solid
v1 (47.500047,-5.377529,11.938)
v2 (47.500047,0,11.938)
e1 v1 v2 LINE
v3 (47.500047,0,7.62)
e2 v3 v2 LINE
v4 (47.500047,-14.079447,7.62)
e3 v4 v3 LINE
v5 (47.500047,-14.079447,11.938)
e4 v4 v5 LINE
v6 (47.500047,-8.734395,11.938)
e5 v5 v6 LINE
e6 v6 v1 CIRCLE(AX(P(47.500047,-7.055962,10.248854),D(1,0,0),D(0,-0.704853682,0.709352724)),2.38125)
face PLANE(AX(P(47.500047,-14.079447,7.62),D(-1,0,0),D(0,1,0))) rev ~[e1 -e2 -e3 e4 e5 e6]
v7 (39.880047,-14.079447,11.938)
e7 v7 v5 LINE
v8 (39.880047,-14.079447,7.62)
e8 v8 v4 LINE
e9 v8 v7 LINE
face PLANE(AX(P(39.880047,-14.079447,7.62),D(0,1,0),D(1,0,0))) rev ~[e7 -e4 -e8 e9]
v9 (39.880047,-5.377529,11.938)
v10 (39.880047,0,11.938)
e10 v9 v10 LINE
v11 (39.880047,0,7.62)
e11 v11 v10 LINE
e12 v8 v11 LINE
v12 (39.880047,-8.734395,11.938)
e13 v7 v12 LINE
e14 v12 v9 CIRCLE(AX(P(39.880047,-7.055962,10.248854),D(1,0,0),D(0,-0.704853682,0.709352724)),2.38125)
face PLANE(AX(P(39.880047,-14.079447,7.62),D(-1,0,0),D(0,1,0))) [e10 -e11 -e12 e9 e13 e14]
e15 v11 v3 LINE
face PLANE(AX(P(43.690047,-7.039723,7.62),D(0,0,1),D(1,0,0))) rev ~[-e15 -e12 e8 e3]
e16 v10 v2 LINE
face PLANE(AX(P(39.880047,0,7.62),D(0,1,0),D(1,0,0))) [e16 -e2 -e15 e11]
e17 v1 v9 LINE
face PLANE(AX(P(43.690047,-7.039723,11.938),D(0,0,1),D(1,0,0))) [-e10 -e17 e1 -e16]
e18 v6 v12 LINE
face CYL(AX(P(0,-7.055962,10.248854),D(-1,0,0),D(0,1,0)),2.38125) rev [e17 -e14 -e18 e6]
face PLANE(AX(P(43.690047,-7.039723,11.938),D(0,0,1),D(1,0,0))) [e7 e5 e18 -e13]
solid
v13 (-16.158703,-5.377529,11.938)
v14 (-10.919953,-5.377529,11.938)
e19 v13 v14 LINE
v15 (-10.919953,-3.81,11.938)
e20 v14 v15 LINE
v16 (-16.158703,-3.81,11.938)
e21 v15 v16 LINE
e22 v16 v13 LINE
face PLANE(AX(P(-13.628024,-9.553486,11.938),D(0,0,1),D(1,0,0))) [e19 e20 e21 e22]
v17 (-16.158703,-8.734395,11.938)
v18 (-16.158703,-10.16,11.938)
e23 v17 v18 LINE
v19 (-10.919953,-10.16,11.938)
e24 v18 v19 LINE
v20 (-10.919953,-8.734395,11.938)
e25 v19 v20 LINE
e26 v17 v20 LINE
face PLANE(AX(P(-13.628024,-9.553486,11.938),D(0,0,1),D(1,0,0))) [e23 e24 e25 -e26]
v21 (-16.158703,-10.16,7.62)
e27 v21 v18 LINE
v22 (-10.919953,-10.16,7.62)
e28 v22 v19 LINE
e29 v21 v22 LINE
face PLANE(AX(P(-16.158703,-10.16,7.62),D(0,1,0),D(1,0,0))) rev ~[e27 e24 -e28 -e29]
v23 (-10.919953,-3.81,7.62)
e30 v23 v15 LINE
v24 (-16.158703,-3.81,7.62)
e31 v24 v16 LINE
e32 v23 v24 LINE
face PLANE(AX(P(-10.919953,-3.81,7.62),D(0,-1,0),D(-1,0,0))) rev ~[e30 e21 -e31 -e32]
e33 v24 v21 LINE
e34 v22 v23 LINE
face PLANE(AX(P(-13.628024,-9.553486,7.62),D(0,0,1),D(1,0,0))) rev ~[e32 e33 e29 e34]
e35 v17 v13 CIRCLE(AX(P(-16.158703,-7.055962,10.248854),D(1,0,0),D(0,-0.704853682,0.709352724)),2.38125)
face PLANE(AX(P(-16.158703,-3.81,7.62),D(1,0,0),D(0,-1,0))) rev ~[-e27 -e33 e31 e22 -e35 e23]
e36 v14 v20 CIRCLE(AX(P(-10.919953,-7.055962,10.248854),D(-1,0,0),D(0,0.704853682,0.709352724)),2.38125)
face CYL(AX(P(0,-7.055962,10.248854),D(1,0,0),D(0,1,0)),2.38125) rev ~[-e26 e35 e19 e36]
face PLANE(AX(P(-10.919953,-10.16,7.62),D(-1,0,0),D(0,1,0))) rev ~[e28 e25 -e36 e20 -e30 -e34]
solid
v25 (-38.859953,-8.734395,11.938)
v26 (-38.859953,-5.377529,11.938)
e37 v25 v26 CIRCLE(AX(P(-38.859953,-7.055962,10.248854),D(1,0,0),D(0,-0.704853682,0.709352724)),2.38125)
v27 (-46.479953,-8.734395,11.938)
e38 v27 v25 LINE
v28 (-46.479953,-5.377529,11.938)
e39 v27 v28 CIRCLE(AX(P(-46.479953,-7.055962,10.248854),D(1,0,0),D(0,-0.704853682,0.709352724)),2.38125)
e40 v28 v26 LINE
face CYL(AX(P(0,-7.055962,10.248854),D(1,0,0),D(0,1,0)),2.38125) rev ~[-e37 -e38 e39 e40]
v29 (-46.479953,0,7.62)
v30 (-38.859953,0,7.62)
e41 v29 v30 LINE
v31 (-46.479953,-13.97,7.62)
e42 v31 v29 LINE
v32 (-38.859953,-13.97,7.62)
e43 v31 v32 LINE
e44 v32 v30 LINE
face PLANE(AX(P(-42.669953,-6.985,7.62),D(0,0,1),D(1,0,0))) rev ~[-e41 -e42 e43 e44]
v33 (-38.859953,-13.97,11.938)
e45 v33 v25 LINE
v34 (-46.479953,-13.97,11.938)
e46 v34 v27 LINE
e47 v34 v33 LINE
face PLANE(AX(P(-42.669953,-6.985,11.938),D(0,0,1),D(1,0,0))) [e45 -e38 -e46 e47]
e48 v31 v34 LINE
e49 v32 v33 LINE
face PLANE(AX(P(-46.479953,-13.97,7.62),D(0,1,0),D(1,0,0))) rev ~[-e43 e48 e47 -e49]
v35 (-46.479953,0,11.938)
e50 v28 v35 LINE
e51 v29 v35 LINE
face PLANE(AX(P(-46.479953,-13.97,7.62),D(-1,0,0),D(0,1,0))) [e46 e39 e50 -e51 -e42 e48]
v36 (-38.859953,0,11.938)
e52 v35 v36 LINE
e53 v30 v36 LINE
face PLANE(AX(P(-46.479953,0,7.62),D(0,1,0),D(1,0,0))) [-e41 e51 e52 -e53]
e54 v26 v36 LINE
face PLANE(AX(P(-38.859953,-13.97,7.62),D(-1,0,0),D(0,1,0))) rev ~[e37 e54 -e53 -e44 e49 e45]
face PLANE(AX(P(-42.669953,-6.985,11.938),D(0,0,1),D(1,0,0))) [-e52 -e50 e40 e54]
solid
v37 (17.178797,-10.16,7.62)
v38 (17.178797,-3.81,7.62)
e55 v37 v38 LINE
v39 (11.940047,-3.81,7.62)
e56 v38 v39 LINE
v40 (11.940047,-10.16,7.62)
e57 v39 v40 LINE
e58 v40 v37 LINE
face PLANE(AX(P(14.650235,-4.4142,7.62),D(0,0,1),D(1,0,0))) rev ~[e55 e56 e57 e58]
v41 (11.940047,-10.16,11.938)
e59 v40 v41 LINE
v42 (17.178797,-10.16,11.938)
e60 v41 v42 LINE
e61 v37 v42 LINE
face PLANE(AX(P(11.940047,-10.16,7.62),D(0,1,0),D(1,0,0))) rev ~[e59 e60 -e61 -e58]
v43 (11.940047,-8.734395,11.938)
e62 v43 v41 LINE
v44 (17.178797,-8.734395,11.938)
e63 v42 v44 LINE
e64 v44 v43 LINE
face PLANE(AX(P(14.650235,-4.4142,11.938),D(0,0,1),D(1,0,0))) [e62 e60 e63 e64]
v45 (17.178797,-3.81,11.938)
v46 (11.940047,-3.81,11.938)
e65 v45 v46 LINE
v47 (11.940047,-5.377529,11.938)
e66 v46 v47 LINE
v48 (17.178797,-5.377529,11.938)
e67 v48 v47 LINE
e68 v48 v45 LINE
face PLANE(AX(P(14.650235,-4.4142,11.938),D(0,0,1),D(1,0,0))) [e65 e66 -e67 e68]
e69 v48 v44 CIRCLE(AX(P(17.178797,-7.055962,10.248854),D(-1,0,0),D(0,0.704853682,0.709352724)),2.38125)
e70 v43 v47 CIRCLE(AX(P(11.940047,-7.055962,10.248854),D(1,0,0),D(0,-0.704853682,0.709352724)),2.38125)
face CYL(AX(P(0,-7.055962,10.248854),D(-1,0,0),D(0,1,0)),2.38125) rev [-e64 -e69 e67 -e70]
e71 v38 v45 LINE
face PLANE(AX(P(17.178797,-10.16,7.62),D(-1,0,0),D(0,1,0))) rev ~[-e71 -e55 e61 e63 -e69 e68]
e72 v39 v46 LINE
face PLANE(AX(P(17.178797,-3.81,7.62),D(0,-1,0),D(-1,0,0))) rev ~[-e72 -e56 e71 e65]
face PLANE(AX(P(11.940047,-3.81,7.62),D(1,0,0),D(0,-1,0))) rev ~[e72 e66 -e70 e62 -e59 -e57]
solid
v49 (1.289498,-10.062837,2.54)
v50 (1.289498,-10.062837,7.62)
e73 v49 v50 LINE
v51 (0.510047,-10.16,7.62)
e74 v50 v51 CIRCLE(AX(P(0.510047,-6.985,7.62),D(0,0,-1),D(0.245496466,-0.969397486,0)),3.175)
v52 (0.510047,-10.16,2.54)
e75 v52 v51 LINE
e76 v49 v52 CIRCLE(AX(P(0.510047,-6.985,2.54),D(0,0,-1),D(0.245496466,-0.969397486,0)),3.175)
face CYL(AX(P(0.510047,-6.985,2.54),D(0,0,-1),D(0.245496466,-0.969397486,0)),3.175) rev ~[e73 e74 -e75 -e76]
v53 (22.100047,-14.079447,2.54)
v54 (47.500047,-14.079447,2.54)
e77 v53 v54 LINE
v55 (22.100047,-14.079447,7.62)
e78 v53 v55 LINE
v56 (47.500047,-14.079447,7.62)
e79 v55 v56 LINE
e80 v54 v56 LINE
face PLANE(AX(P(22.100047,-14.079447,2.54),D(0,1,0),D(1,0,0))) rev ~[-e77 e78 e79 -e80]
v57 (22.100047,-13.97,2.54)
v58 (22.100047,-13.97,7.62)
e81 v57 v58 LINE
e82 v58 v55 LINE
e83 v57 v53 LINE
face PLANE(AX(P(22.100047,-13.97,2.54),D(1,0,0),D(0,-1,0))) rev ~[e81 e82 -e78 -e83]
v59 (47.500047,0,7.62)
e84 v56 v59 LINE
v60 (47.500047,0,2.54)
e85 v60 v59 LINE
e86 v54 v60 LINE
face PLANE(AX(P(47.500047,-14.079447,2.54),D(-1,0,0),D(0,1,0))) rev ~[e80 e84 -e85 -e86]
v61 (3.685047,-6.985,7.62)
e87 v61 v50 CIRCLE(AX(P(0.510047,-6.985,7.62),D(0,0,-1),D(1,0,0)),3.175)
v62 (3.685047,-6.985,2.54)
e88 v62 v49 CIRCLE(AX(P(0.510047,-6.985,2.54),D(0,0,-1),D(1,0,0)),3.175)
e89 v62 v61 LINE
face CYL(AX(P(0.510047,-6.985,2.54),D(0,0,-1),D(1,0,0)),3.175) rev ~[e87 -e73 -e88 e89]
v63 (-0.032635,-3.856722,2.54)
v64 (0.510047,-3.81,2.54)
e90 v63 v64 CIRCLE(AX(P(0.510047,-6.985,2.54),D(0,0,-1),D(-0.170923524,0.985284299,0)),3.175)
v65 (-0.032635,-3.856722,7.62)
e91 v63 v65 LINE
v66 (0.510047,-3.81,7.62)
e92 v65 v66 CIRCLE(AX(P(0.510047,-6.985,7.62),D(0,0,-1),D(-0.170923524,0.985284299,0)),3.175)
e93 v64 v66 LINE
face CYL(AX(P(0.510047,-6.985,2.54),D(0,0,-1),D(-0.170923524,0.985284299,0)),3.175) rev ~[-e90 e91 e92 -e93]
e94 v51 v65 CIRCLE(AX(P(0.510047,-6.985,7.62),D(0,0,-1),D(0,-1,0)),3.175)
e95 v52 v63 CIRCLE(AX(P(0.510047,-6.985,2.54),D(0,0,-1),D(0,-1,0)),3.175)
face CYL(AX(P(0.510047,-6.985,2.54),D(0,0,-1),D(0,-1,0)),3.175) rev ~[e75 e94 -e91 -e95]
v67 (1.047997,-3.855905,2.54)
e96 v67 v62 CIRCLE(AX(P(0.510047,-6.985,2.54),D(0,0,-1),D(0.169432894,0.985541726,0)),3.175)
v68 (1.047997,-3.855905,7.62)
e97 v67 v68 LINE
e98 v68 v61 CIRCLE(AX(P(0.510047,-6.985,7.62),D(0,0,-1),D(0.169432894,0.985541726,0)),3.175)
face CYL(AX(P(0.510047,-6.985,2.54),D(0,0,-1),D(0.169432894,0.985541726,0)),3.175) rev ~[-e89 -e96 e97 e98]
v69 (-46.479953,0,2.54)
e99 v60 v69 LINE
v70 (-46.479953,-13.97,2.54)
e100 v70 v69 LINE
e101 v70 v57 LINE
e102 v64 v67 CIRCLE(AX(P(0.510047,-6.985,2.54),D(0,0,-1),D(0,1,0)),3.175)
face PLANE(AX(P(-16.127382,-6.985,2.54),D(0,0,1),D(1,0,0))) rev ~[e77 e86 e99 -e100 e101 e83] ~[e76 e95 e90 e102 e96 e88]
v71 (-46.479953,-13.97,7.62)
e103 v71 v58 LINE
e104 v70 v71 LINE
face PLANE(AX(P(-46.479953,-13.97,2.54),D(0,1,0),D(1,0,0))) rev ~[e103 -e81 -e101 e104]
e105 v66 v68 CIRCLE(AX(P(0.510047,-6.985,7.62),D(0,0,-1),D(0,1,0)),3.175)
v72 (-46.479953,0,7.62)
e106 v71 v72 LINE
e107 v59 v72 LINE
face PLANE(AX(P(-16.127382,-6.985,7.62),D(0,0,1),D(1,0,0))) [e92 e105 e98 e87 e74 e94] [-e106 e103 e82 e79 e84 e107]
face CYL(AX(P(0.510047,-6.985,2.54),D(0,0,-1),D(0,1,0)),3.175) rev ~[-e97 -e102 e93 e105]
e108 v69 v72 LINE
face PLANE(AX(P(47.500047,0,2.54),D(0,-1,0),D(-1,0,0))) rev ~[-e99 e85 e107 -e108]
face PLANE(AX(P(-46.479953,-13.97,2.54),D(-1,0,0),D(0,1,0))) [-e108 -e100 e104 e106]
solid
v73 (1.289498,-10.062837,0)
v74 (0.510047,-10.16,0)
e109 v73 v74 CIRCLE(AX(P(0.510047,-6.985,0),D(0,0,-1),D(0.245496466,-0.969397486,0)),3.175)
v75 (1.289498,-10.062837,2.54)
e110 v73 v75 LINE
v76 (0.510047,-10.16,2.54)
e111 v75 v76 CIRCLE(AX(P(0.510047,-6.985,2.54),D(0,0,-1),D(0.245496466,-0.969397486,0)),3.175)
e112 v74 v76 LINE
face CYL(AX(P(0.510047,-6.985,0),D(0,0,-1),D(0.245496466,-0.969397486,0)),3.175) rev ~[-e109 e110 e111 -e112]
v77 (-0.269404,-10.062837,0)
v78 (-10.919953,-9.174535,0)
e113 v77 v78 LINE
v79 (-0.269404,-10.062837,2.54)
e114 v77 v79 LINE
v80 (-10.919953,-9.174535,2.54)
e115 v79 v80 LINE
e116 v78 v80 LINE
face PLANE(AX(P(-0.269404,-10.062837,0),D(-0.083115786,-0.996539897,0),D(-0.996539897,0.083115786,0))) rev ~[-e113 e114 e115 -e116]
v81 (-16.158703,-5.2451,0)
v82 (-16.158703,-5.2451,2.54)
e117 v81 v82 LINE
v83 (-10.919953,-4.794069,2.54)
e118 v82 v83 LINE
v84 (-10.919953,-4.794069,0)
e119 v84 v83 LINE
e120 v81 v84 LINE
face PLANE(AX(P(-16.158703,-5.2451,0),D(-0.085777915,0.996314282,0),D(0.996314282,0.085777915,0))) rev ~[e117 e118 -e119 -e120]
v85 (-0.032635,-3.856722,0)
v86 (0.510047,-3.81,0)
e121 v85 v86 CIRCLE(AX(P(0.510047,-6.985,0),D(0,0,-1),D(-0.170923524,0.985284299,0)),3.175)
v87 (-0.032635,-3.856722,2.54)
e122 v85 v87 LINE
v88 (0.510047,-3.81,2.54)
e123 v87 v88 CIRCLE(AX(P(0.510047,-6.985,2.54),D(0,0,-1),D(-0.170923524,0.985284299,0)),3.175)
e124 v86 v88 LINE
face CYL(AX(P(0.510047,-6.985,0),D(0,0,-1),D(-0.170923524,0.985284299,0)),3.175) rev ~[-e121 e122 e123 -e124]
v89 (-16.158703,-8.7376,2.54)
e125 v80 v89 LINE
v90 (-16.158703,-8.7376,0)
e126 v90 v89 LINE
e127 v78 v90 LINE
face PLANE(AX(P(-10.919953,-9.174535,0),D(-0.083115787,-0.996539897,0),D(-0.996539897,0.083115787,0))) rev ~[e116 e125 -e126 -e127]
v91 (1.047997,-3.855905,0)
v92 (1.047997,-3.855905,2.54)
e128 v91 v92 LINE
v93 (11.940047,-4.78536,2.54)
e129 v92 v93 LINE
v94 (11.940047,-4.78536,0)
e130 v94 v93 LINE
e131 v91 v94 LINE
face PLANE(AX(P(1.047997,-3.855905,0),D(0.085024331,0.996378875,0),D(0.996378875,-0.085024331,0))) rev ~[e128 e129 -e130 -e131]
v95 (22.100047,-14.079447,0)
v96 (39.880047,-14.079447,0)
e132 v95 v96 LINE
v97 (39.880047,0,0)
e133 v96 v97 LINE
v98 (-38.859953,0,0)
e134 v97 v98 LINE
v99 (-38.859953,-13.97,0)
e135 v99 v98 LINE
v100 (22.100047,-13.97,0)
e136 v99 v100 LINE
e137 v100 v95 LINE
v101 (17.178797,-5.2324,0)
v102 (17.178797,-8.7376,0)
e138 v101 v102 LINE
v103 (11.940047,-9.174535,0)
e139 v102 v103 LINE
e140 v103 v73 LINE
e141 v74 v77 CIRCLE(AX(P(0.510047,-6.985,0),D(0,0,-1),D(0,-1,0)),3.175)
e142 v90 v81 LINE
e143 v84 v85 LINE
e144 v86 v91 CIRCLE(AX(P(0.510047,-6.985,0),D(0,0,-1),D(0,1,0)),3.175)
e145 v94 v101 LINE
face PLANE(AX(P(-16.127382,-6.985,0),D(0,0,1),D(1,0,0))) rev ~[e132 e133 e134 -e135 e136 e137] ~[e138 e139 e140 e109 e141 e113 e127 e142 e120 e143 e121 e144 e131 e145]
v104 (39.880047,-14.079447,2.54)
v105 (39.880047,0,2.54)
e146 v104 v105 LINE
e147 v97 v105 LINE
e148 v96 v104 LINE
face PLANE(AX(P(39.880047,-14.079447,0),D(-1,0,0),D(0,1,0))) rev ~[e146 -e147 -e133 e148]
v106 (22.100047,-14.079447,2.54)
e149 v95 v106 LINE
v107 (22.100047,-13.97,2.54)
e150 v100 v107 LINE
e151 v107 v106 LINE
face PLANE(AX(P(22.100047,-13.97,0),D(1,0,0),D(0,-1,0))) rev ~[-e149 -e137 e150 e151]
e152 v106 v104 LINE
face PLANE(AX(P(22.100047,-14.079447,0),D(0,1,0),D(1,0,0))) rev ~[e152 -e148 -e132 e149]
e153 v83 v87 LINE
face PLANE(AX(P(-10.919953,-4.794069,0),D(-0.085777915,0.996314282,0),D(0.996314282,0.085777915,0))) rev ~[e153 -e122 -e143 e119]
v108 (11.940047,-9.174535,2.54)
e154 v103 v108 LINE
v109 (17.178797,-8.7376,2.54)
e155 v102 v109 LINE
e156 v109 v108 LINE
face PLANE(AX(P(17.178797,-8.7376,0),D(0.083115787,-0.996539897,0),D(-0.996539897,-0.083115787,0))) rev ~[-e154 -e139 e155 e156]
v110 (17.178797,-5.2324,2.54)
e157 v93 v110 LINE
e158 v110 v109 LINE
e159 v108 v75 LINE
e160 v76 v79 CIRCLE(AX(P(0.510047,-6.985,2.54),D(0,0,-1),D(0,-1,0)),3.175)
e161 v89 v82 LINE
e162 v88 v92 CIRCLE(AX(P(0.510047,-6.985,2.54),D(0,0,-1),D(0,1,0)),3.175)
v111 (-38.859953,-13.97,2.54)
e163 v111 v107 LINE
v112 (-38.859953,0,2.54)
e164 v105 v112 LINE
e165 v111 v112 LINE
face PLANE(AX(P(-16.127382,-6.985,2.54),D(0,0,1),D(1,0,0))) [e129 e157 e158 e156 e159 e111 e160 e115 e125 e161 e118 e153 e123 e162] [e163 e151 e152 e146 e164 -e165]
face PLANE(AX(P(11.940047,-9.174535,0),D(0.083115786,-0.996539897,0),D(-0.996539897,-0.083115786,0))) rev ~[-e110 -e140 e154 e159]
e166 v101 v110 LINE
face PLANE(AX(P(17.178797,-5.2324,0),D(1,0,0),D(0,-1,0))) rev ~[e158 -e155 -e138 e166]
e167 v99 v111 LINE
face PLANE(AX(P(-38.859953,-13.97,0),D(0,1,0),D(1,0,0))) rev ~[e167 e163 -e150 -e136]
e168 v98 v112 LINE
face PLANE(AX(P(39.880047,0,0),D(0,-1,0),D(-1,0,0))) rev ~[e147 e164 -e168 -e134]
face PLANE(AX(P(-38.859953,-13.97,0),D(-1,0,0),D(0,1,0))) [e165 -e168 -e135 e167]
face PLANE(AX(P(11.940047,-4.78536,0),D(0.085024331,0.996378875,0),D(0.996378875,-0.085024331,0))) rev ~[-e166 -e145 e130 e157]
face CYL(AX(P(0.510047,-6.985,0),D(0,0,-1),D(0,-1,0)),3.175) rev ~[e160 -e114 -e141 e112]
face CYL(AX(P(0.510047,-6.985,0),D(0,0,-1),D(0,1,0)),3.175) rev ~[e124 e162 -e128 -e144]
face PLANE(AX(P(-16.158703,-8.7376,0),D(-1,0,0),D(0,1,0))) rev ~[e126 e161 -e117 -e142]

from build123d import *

# Parameters (mm, degrees)
F0_W          = 17.78
F0_H          = 13.97
F1_DEPTH      = 2.54
F2_START      = 2.54
F0_W_2        = 7.62
F0_H_2        = 14.0794469044
F2_DEPTH      = 5.08
F3_START      = 7.62
F3_DEPTH      = 4.318
F4_R          = 2.38125
F5_DEPTH      = 50.8
F5_DEPTH_BACK = 50.8


with BuildPart() as f1:
    # F0 (on Top) → F1 (new body)
    with BuildSketch(Plane.XY):
        Polygon((-21.0799529247, 0), (-21.0799529247, -13.97), (-10.9199529247, -13.97), (-10.9199529247, -10.16), (-16.1587029247, -10.16), (-16.1587029247, -8.7376), (-16.1587029247, -5.2451), (-16.1587029247, -3.81), (-10.9199529247, -3.81), (-10.9199529247, 0), align=None)
        with Locations((-29.9699529247, -6.985)):
            Rectangle(F0_W, F0_H)
        Polygon((-10.9199529247, -10.16), (-10.9199529247, -13.97), (11.9400470753, -13.97), (11.9400470753, -10.16), (0.5100470753, -10.16), align=None)
        Polygon((11.9400470753, -10.16), (11.9400470753, -13.97), (22.1000470753, -13.97), (22.1000470753, 0), (11.9400470753, 0), (11.9400470753, -3.81), (17.1787970753, -3.81), (17.1787970753, -5.2324), (17.1787970753, -8.7376), (17.1787970753, -10.16), align=None)
        with BuildLine():
            Line((-10.9199529247, -9.1745346656), (-10.9199529247, -10.16))
            Line((-10.9199529247, -10.16), (0.5100470753, -10.16))
            ThreePointArc((0.5100470753, -10.16), (0.1173051299, -10.1356156167), (-0.2694042043, -10.0628370169))
            Line((-0.2694042043, -10.0628370169), (-10.9199529247, -9.1745346656))
        make_face()
        Polygon((-16.1587029247, -10.16), (-10.9199529247, -10.16), (-10.9199529247, -9.1745346656), (-16.1587029247, -8.7376), align=None)
        Polygon((11.9400470753, 0), (-10.9199529247, 0), (-10.9199529247, -3.81), (0.5100470753, -3.81), (11.9400470753, -3.81), align=None)
        Polygon((22.1000470753, 0), (22.1000470753, -13.97), (22.1000470753, -14.0794469044), (39.8800470753, -14.0794469044), (39.8800470753, 0), align=None)
        Polygon((11.9400470753, -9.1745346656), (11.9400470753, -10.16), (17.1787970753, -10.16), (17.1787970753, -8.7376), align=None)
        with BuildLine():
            Line((0.5100470753, -10.16), (11.9400470753, -10.16))
            Line((11.9400470753, -10.16), (11.9400470753, -9.1745346656))
            Line((11.9400470753, -9.1745346656), (1.2894983548, -10.0628370169))
            ThreePointArc((1.2894983548, -10.0628370169), (0.9027890206, -10.1356156167), (0.5100470753, -10.16))
        make_face()
        Polygon((-10.9199529247, -4.7940685714), (-10.9199529247, -3.81), (-16.1587029247, -3.81), (-16.1587029247, -5.2451), align=None)
        with BuildLine():
            Line((0.5100470753, -3.81), (-10.9199529247, -3.81))
            Line((-10.9199529247, -3.81), (-10.9199529247, -4.7940685714))
            Line((-10.9199529247, -4.7940685714), (-0.0326351146, -3.8567223523))
            ThreePointArc((-0.0326351146, -3.8567223523), (0.237702194, -3.8217021535), (0.5100470753, -3.81))
        make_face()
        with BuildLine():
            Line((11.9400470753, -4.78536), (11.9400470753, -3.81))
            Line((11.9400470753, -3.81), (0.5100470753, -3.81))
            ThreePointArc((0.5100470753, -3.81), (0.7799993252, -3.8214970708), (1.0479965137, -3.8559050187))
            Line((1.0479965137, -3.8559050187), (11.9400470753, -4.78536))
        make_face()
        Polygon((17.1787970753, -3.81), (11.9400470753, -3.81), (11.9400470753, -4.78536), (17.1787970753, -5.2324), align=None)
    extrude(amount=F1_DEPTH)


with BuildPart() as f2:
    # F0 (on Top) → F2 (new body)
    with BuildSketch(Plane.XY.offset(F2_START)):
        Polygon((-21.0799529247, 0), (-21.0799529247, -13.97), (-10.9199529247, -13.97), (-10.9199529247, -10.16), (-16.1587029247, -10.16), (-16.1587029247, -8.7376), (-16.1587029247, -5.2451), (-16.1587029247, -3.81), (-10.9199529247, -3.81), (-10.9199529247, 0), align=None)
        with Locations((-29.9699529247, -6.985)):
            Rectangle(F0_W, F0_H)
        Polygon((-10.9199529247, -10.16), (-10.9199529247, -13.97), (11.9400470753, -13.97), (11.9400470753, -10.16), (0.5100470753, -10.16), align=None)
        with Locations((-42.6699529247, -6.985)):
            Rectangle(F0_W_2, F0_H)
        Polygon((11.9400470753, -10.16), (11.9400470753, -13.97), (22.1000470753, -13.97), (22.1000470753, 0), (11.9400470753, 0), (11.9400470753, -3.81), (17.1787970753, -3.81), (17.1787970753, -5.2324), (17.1787970753, -8.7376), (17.1787970753, -10.16), align=None)
        with BuildLine():
            Line((-10.9199529247, -9.1745346656), (-10.9199529247, -10.16))
            Line((-10.9199529247, -10.16), (0.5100470753, -10.16))
            ThreePointArc((0.5100470753, -10.16), (0.1173051299, -10.1356156167), (-0.2694042043, -10.0628370169))
            Line((-0.2694042043, -10.0628370169), (-10.9199529247, -9.1745346656))
        make_face()
        Polygon((-16.1587029247, -10.16), (-10.9199529247, -10.16), (-10.9199529247, -9.1745346656), (-16.1587029247, -8.7376), align=None)
        Polygon((11.9400470753, 0), (-10.9199529247, 0), (-10.9199529247, -3.81), (0.5100470753, -3.81), (11.9400470753, -3.81), align=None)
        Polygon((22.1000470753, 0), (22.1000470753, -13.97), (22.1000470753, -14.0794469044), (39.8800470753, -14.0794469044), (39.8800470753, 0), align=None)
        Polygon((11.9400470753, -9.1745346656), (11.9400470753, -10.16), (17.1787970753, -10.16), (17.1787970753, -8.7376), align=None)
        with BuildLine():
            Line((0.5100470753, -10.16), (11.9400470753, -10.16))
            Line((11.9400470753, -10.16), (11.9400470753, -9.1745346656))
            Line((11.9400470753, -9.1745346656), (1.2894983548, -10.0628370169))
            ThreePointArc((1.2894983548, -10.0628370169), (0.9027890206, -10.1356156167), (0.5100470753, -10.16))
        make_face()
        with BuildLine():
            Line((-10.9199529247, -4.7940685714), (-10.9199529247, -9.1745346656))
            Line((-10.9199529247, -9.1745346656), (-0.2694042043, -10.0628370169))
            ThreePointArc((-0.2694042043, -10.0628370169), (-2.6626448473, -6.8639588303), (-0.0326351146, -3.8567223523))
            Line((-0.0326351146, -3.8567223523), (-10.9199529247, -4.7940685714))
        make_face()
        Polygon((-16.1587029247, -8.7376), (-10.9199529247, -9.1745346656), (-10.9199529247, -4.7940685714), (-16.1587029247, -5.2451), align=None)
        Polygon((-10.9199529247, -4.7940685714), (-10.9199529247, -3.81), (-16.1587029247, -3.81), (-16.1587029247, -5.2451), align=None)
        with BuildLine():
            Line((0.5100470753, -3.81), (-10.9199529247, -3.81))
            Line((-10.9199529247, -3.81), (-10.9199529247, -4.7940685714))
            Line((-10.9199529247, -4.7940685714), (-0.0326351146, -3.8567223523))
            ThreePointArc((-0.0326351146, -3.8567223523), (0.237702194, -3.8217021535), (0.5100470753, -3.81))
        make_face()
        Polygon((11.9400470753, -4.78536), (11.9400470753, -9.1745346656), (17.1787970753, -8.7376), (17.1787970753, -5.2324), align=None)
        with BuildLine():
            Line((1.2894983548, -10.0628370169), (11.9400470753, -9.1745346656))
            Line((11.9400470753, -9.1745346656), (11.9400470753, -4.78536))
            Line((11.9400470753, -4.78536), (1.0479965137, -3.8559050187))
            ThreePointArc((1.0479965137, -3.8559050187), (2.9378665153, -4.938950693), (3.6850470753, -6.985))
            ThreePointArc((3.6850470753, -6.985), (3.0155792356, -8.9351111747), (1.2894983548, -10.0628370169))
        make_face()
        with BuildLine():
            Line((11.9400470753, -4.78536), (11.9400470753, -3.81))
            Line((11.9400470753, -3.81), (0.5100470753, -3.81))
            ThreePointArc((0.5100470753, -3.81), (0.7799993252, -3.8214970708), (1.0479965137, -3.8559050187))
            Line((1.0479965137, -3.8559050187), (11.9400470753, -4.78536))
        make_face()
        Polygon((17.1787970753, -3.81), (11.9400470753, -3.81), (11.9400470753, -4.78536), (17.1787970753, -5.2324), align=None)
        with Locations((43.6900470753, -7.0397234522)):
            Rectangle(F0_W_2, F0_H_2)
    extrude(amount=F2_DEPTH)


with BuildPart() as f3:
    # F0 (on Top) → F3 (new body)
    with BuildSketch(Plane.XY.offset(F3_START)):
        Polygon((-16.1587029247, -10.16), (-10.9199529247, -10.16), (-10.9199529247, -9.1745346656), (-16.1587029247, -8.7376), align=None)
        Polygon((-10.9199529247, -4.7940685714), (-10.9199529247, -3.81), (-16.1587029247, -3.81), (-16.1587029247, -5.2451), align=None)
        Polygon((-16.1587029247, -8.7376), (-10.9199529247, -9.1745346656), (-10.9199529247, -4.7940685714), (-16.1587029247, -5.2451), align=None)
    extrude(amount=F3_DEPTH)


with BuildPart() as f3b:
    # F0 (on Top) → F3, piece 2 (new body)
    with BuildSketch(Plane.XY.offset(F3_START)):
        Polygon((17.1787970753, -3.81), (11.9400470753, -3.81), (11.9400470753, -4.78536), (17.1787970753, -5.2324), align=None)
        Polygon((11.9400470753, -4.78536), (11.9400470753, -9.1745346656), (17.1787970753, -8.7376), (17.1787970753, -5.2324), align=None)
        Polygon((11.9400470753, -9.1745346656), (11.9400470753, -10.16), (17.1787970753, -10.16), (17.1787970753, -8.7376), align=None)
    extrude(amount=F3_DEPTH)


with BuildPart() as f3c:
    # F0 (on Top) → F3, piece 3 (new body)
    with BuildSketch(Plane.XY.offset(F3_START)):
        with Locations((-42.6699529247, -6.985)):
            Rectangle(F0_W_2, F0_H)
    extrude(amount=F3_DEPTH)


with BuildPart() as f3d:
    # F0 (on Top) → F3, piece 4 (new body)
    with BuildSketch(Plane.XY.offset(F3_START)):
        with Locations((43.6900470753, -7.0397234522)):
            Rectangle(F0_W_2, F0_H_2)
    extrude(amount=F3_DEPTH)


with BuildPart() as f5_tool:
    # F4 (on Right) → F5 (new body, two sides)
    with BuildSketch(Plane.YZ) as f5_sk:
        with Locations((-7.0559619926, 10.248853825)):
            Circle(F4_R)
    extrude(amount=-F5_DEPTH)
    extrude(f5_sk.sketch, amount=F5_DEPTH_BACK)


with BuildPart() as f3_1:
    add(f3.part)

    # F5: cut by f5_tool
    add(f5_tool.part, mode=Mode.SUBTRACT)


with BuildPart() as f3b_1:
    add(f3b.part)

    # F5: cut by f5_tool
    add(f5_tool.part, mode=Mode.SUBTRACT)


with BuildPart() as f3c_1:
    add(f3c.part)

    # F5: cut by f5_tool
    add(f5_tool.part, mode=Mode.SUBTRACT)


with BuildPart() as f3d_1:
    add(f3d.part)

    # F5: cut by f5_tool
    add(f5_tool.part, mode=Mode.SUBTRACT)


solid = Compound([f1.part, f2.part, f3_1.part, f3b_1.part, f3c_1.part, f3d_1.part])
